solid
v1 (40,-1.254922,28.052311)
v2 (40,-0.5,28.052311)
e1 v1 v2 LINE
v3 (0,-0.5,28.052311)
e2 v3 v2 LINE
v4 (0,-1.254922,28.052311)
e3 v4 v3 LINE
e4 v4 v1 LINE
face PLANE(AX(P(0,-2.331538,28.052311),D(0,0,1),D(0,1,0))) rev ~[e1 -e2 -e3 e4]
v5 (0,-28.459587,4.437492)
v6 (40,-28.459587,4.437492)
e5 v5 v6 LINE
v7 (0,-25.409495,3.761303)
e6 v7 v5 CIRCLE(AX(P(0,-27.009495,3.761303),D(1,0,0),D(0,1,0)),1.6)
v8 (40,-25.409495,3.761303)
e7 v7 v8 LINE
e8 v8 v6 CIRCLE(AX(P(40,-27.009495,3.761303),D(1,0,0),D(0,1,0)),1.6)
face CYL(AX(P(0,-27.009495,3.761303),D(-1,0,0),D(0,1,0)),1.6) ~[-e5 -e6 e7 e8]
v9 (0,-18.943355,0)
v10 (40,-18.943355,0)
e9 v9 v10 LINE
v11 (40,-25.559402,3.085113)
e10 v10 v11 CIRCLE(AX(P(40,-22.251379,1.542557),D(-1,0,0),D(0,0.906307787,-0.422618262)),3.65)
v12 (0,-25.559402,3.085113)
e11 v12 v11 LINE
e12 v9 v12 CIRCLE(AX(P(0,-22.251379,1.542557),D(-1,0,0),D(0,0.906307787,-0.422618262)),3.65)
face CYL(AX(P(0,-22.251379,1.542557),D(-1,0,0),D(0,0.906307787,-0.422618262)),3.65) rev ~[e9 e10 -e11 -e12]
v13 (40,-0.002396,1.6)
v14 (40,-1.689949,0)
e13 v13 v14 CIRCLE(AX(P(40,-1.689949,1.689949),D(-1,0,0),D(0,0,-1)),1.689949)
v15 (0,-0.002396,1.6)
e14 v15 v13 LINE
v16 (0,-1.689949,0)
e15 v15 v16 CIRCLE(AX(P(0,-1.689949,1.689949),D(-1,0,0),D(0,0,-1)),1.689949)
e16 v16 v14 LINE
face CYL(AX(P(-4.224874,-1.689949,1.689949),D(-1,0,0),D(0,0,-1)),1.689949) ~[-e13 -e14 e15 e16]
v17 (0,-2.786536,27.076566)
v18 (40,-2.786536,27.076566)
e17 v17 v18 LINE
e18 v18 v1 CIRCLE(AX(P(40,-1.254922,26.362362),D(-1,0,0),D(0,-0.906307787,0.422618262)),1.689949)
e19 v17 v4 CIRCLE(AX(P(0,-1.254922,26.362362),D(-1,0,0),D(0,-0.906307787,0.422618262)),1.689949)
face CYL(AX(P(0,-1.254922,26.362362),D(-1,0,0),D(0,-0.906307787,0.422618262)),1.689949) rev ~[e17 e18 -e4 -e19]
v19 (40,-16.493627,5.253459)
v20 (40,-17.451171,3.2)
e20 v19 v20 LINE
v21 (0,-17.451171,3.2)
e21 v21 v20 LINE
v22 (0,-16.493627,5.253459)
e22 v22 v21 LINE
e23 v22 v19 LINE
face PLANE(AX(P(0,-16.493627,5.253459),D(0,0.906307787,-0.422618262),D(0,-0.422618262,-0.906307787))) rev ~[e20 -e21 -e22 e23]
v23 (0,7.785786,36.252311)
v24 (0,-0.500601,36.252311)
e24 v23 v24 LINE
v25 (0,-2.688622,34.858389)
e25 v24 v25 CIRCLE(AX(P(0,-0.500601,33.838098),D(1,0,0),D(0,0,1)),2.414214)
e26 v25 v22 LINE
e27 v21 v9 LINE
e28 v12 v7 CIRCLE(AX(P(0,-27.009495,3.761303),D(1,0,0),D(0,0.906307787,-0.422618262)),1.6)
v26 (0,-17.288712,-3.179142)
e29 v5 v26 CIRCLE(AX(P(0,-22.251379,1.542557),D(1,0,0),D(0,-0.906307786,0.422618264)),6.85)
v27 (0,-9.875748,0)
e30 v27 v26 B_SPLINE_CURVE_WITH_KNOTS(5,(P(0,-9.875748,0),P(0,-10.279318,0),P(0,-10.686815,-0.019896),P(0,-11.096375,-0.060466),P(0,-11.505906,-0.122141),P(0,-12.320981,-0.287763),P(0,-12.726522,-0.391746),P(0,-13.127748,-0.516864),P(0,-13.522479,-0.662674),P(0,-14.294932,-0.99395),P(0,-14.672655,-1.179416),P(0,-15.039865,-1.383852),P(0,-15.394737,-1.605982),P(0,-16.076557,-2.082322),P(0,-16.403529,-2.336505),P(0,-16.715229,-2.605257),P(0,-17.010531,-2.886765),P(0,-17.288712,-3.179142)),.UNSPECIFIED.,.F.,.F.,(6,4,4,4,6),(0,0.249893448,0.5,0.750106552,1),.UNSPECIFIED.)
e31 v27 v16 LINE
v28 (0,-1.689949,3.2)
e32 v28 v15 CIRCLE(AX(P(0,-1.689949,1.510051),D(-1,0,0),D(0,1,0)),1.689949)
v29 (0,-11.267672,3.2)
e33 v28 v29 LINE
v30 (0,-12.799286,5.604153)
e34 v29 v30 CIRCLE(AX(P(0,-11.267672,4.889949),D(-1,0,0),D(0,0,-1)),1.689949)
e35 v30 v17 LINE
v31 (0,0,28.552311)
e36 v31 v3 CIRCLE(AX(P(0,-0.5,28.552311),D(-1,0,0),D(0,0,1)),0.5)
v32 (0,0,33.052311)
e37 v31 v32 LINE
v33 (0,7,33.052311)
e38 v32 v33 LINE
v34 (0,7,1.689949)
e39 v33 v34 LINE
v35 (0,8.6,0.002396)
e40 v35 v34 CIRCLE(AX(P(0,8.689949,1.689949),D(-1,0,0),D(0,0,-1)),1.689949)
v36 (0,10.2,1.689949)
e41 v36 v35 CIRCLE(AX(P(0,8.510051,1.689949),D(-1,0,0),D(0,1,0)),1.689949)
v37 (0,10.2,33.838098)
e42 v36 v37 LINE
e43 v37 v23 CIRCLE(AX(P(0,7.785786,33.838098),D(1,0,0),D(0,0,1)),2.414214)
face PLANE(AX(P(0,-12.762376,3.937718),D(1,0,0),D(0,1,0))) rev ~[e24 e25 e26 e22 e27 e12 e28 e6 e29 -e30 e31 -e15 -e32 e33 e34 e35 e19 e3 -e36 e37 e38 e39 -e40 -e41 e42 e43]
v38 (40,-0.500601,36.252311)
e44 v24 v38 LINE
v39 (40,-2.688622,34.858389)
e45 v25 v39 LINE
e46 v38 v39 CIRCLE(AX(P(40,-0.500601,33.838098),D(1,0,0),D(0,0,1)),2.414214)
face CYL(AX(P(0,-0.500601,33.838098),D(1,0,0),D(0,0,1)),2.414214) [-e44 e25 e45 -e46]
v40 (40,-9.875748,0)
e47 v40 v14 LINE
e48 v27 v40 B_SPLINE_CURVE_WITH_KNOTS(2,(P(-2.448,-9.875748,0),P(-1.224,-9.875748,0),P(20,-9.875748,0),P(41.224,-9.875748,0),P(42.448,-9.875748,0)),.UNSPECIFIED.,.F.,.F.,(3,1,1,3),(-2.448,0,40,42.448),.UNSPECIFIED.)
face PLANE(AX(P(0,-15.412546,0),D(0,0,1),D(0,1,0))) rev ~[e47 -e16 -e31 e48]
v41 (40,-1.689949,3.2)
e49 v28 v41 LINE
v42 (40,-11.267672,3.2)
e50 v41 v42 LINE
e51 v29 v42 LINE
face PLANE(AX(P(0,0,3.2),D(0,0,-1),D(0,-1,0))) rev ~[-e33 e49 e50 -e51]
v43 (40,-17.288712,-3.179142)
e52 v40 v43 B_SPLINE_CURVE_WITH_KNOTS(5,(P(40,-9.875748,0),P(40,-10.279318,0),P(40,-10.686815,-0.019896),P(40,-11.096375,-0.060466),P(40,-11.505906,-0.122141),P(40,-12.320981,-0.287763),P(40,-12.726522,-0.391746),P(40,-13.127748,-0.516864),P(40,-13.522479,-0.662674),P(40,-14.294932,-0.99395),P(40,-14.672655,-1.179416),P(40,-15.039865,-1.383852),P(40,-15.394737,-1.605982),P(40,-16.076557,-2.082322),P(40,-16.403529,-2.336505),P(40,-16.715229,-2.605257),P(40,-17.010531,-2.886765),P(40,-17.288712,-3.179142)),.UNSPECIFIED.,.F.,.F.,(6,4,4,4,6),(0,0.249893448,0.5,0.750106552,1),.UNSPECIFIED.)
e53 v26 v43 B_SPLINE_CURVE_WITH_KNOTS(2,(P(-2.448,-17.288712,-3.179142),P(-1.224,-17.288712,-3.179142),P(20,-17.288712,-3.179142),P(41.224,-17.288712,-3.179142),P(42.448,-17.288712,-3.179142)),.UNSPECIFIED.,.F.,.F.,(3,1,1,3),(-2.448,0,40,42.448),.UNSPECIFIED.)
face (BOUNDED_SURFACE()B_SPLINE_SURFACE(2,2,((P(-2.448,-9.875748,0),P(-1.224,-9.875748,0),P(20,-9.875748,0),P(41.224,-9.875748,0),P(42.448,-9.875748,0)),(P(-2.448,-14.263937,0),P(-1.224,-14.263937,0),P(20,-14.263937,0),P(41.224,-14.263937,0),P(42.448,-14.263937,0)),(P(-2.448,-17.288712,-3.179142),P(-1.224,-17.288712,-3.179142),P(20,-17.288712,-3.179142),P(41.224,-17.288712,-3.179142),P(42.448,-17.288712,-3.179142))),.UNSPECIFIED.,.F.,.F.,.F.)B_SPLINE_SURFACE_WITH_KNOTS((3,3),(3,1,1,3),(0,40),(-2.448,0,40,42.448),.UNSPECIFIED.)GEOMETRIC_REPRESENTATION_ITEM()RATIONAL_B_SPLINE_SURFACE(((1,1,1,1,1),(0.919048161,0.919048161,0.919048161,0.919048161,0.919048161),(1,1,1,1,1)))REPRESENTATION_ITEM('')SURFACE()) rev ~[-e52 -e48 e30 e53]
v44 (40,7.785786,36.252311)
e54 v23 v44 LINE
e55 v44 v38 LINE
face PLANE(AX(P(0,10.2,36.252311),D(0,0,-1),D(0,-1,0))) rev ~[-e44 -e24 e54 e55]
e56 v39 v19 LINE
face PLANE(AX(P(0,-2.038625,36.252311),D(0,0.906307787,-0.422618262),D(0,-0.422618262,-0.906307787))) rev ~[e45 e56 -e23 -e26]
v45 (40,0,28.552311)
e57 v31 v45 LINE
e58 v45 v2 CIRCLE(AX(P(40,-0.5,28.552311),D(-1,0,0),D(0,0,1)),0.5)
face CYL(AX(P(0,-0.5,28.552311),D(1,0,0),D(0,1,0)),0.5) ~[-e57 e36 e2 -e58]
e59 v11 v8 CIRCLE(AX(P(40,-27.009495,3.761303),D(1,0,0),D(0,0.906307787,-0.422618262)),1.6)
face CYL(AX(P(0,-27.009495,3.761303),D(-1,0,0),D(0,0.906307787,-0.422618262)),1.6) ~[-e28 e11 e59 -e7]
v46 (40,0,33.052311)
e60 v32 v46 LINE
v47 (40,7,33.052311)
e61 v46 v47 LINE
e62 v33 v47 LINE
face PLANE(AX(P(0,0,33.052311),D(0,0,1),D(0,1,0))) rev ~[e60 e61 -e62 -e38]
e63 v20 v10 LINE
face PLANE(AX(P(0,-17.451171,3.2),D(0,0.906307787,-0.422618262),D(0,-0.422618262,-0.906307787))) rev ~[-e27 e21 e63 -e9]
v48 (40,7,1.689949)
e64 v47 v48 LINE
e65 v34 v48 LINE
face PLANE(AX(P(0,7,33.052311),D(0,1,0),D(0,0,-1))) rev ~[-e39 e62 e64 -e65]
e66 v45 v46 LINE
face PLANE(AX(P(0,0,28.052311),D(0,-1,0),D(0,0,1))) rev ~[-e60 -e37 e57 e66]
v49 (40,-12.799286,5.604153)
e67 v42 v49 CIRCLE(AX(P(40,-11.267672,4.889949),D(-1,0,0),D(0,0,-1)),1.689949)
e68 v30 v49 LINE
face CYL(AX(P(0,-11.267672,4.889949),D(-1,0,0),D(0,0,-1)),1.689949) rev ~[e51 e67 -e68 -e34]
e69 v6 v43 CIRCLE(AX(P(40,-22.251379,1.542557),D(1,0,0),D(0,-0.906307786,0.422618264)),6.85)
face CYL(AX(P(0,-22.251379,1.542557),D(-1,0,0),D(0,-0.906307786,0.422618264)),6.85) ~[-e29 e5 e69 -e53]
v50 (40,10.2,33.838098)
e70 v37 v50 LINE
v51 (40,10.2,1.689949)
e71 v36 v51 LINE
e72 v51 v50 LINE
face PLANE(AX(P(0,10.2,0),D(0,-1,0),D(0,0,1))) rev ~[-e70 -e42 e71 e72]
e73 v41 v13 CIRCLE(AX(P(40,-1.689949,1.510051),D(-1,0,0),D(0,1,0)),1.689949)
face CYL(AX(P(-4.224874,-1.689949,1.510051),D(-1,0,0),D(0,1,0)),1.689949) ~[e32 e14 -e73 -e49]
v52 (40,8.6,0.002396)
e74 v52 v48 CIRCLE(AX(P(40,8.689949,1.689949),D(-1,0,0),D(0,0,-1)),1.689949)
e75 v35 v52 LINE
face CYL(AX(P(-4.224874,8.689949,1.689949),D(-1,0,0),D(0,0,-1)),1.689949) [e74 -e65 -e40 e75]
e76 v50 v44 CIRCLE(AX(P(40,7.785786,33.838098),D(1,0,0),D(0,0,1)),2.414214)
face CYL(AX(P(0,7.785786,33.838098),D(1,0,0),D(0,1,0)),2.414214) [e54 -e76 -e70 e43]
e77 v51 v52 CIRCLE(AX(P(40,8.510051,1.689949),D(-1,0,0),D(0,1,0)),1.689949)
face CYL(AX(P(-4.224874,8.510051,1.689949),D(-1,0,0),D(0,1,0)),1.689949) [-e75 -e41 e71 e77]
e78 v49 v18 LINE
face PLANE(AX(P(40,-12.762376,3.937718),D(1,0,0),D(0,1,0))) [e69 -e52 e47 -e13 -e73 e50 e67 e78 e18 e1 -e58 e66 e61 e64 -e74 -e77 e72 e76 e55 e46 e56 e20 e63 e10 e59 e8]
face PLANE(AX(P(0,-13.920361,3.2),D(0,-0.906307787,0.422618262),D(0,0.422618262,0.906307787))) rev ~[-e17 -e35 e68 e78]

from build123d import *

# Parameters (mm, degrees)
F1_DEPTH    = 40
F2_R        = 2.4142135624
F3_R        = 10.2321597652
F4_T1_DEPTH = 40
F4_T3_DEPTH = 48.4497474683
F5_R        = 0.5


# Not quite as in the source:
# - a fillet or chamfer that OpenCascade refuses, or shapes differently, is made with other operations: its cross-section is extruded or revolved along the edge and cut away or added


with BuildPart() as f1:
    # F0 (on Right) → F1 (new body)
    with BuildSketch(Plane.YZ):
        with BuildLine():
            ThreePointArc((-25.4094946088, 3.7613025295), (-26.6631912182, 5.323376139), (-28.4595870608, 4.4374917638))
            ThreePointArc((-28.4595870608, 4.4374917638), (-27.6856838354, 2.3112100739), (-25.5594021496, 3.0851133107))
            ThreePointArc((-25.5594021496, 3.0851133107), (-25.4474209974, 3.4149991472), (-25.4094946088, 3.7613025295))
        make_face()
        with BuildLine():
            ThreePointArc((-16.0431703857, -1.3523784376), (-15.774850852, -0.6883818658), (-15.577323066, 0))
            Line((-15.577323066, 0), (-18.9433553042, 0))
            ThreePointArc((-18.9433553042, 0), (-23.7939353822, -1.7654667673), (-25.5594021496, 3.0851133107))
            ThreePointArc((-25.5594021496, 3.0851133107), (-27.6856838354, 2.3112100739), (-28.4595870608, 4.4374917638))
            ThreePointArc((-28.4595870608, 4.4374917638), (-25.1463138276, -4.6656516822), (-16.0431703857, -1.3523784376))
        make_face()
        with BuildLine():
            ThreePointArc((-15.4013787269, 1.5425566554), (-15.4524550708, 2.3775040298), (-15.604922411, 3.2))
            Line((-15.604922411, 3.2), (-17.4511707981, 3.2))
            Line((-17.4511707981, 3.2), (-18.9433553042, 0))
            Line((-18.9433553042, 0), (-15.577323066, 0))
            ThreePointArc((-15.577323066, 0), (-15.4455069504, 0.7662774779), (-15.4013787269, 1.5425566554))
        make_face()
        with BuildLine():
            Line((-15.4125459635, 0), (-13.9203614574, 3.2))
            Line((-13.9203614574, 3.2), (-15.604922411, 3.2))
            ThreePointArc((-15.604922411, 3.2), (-15.4524550708, 2.3775040298), (-15.4013787269, 1.5425566554))
            ThreePointArc((-15.4013787269, 1.5425566554), (-15.4455069504, 0.7662774779), (-15.577323066, 0))
            Line((-15.577323066, 0), (-15.4125459635, 0))
        make_face()
        Polygon((-2.0386248346, 0), (0, 0), (0, 3.2), (-13.9203614574, 3.2), (-15.4125459635, 0), align=None)
        with BuildLine():
            Line((-15.604922411, 3.2), (-13.9203614574, 3.2))
            Line((-13.9203614574, 3.2), (-2.3315382908, 28.0523114815))
            Line((-2.3315382908, 28.0523114815), (0, 33.0523114815))
            Line((0, 33.0523114815), (7, 33.0523114815))
            Line((7, 33.0523114815), (7, 0))
            Line((7, 0), (10.2, 0))
            Line((10.2, 0), (10.2, 36.2523114815))
            Line((10.2, 36.2523114815), (-2.0386248346, 36.2523114815))
            Line((-2.0386248346, 36.2523114815), (-16.4936271239, 5.253459036))
            ThreePointArc((-16.4936271239, 5.253459036), (-15.9648640306, 4.2632611548), (-15.604922411, 3.2))
        make_face()
        with BuildLine():
            Line((-16.0431703857, -1.3523784376), (-15.4125459635, 0))
            Line((-15.4125459635, 0), (-15.577323066, 0))
            ThreePointArc((-15.577323066, 0), (-15.774850852, -0.6883818658), (-16.0431703857, -1.3523784376))
        make_face()
        with BuildLine():
            Line((-17.4511707981, 3.2), (-15.604922411, 3.2))
            ThreePointArc((-15.604922411, 3.2), (-15.9648640306, 4.2632611548), (-16.4936271239, 5.253459036))
            Line((-16.4936271239, 5.253459036), (-17.4511707981, 3.2))
        make_face()
        Polygon((-2.3315382908, 28.0523114815), (0, 28.0523114815), (0, 33.0523114815), align=None)
    extrude(amount=F1_DEPTH)

    # F2
    f2_edges = [f1.edges().sort_by_distance(p)[0] for p in [
        (20, -2.038625, 36.252311),
        (20, 10.2, 36.252311),
    ]]
    fillet(f2_edges, radius=F2_R)

    # F3
    f3_edges = [f1.edges().sort_by_distance(p)[0] for p in [
        (20, -15.412546, 0),
    ]]
    fillet(f3_edges, radius=F3_R)

    # F4: fillet of radius 1.6899494937 on 6 edges, made by hand

    # F4_s2 → F4_t1 (join)
    with BuildSketch(Plane.YZ):
        with BuildLine():
            ThreePointArc((-11.2676721112, 3.2), (-12.692961058, 3.9819402926), (-12.799286497, 5.6041530111))
            Line((-12.799286497, 5.6041530111), (-13.9203614574, 3.2))
            Line((-13.9203614574, 3.2), (-11.2676721112, 3.2))
        make_face()
        with BuildLine():
            ThreePointArc((-2.7865361119, 27.0765655052), (-2.1629309272, 27.7876509346), (-1.2549217261, 28.0523114815))
            Line((-1.2549217261, 28.0523114815), (-2.3315382908, 28.0523114815))
            Line((-2.3315382908, 28.0523114815), (-2.7865361119, 27.0765655052))
        make_face()
    extrude(amount=F4_T1_DEPTH)

    # F4_s4 → F4_t3 (cut)
    with BuildSketch(Plane.YZ.offset(-4.2248737342)):
        with BuildLine():
            ThreePointArc((8.6899494937, 0), (7.4949747468, 0.4949747468), (7, 1.6899494937))
            Line((7, 1.6899494937), (7, 0))
            Line((7, 0), (8.6899494937, 0))
        make_face()
        with BuildLine():
            ThreePointArc((0, 1.5100505063), (-0.4949747468, 2.7050252532), (-1.6899494937, 3.2))
            Line((-1.6899494937, 3.2), (0, 3.2))
            Line((0, 3.2), (0, 1.5100505063))
        make_face()
        with BuildLine():
            ThreePointArc((-1.6899494937, 0), (-0.4949747468, 0.4949747468), (0, 1.6899494937))
            Line((0, 1.6899494937), (0, 0))
            Line((0, 0), (-1.6899494937, 0))
        make_face()
        with BuildLine():
            ThreePointArc((10.2, 1.6899494937), (9.7050252532, 0.4949747468), (8.5100505063, 0))
            Line((8.5100505063, 0), (10.2, 0))
            Line((10.2, 0), (10.2, 1.6899494937))
        make_face()
    extrude(amount=F4_T3_DEPTH, mode=Mode.SUBTRACT)

    # F5
    f5_edges = [f1.edges().sort_by_distance(p)[0] for p in [
        (20, 0, 28.052311),
    ]]
    fillet(f5_edges, radius=F5_R)


solid = f1.part
